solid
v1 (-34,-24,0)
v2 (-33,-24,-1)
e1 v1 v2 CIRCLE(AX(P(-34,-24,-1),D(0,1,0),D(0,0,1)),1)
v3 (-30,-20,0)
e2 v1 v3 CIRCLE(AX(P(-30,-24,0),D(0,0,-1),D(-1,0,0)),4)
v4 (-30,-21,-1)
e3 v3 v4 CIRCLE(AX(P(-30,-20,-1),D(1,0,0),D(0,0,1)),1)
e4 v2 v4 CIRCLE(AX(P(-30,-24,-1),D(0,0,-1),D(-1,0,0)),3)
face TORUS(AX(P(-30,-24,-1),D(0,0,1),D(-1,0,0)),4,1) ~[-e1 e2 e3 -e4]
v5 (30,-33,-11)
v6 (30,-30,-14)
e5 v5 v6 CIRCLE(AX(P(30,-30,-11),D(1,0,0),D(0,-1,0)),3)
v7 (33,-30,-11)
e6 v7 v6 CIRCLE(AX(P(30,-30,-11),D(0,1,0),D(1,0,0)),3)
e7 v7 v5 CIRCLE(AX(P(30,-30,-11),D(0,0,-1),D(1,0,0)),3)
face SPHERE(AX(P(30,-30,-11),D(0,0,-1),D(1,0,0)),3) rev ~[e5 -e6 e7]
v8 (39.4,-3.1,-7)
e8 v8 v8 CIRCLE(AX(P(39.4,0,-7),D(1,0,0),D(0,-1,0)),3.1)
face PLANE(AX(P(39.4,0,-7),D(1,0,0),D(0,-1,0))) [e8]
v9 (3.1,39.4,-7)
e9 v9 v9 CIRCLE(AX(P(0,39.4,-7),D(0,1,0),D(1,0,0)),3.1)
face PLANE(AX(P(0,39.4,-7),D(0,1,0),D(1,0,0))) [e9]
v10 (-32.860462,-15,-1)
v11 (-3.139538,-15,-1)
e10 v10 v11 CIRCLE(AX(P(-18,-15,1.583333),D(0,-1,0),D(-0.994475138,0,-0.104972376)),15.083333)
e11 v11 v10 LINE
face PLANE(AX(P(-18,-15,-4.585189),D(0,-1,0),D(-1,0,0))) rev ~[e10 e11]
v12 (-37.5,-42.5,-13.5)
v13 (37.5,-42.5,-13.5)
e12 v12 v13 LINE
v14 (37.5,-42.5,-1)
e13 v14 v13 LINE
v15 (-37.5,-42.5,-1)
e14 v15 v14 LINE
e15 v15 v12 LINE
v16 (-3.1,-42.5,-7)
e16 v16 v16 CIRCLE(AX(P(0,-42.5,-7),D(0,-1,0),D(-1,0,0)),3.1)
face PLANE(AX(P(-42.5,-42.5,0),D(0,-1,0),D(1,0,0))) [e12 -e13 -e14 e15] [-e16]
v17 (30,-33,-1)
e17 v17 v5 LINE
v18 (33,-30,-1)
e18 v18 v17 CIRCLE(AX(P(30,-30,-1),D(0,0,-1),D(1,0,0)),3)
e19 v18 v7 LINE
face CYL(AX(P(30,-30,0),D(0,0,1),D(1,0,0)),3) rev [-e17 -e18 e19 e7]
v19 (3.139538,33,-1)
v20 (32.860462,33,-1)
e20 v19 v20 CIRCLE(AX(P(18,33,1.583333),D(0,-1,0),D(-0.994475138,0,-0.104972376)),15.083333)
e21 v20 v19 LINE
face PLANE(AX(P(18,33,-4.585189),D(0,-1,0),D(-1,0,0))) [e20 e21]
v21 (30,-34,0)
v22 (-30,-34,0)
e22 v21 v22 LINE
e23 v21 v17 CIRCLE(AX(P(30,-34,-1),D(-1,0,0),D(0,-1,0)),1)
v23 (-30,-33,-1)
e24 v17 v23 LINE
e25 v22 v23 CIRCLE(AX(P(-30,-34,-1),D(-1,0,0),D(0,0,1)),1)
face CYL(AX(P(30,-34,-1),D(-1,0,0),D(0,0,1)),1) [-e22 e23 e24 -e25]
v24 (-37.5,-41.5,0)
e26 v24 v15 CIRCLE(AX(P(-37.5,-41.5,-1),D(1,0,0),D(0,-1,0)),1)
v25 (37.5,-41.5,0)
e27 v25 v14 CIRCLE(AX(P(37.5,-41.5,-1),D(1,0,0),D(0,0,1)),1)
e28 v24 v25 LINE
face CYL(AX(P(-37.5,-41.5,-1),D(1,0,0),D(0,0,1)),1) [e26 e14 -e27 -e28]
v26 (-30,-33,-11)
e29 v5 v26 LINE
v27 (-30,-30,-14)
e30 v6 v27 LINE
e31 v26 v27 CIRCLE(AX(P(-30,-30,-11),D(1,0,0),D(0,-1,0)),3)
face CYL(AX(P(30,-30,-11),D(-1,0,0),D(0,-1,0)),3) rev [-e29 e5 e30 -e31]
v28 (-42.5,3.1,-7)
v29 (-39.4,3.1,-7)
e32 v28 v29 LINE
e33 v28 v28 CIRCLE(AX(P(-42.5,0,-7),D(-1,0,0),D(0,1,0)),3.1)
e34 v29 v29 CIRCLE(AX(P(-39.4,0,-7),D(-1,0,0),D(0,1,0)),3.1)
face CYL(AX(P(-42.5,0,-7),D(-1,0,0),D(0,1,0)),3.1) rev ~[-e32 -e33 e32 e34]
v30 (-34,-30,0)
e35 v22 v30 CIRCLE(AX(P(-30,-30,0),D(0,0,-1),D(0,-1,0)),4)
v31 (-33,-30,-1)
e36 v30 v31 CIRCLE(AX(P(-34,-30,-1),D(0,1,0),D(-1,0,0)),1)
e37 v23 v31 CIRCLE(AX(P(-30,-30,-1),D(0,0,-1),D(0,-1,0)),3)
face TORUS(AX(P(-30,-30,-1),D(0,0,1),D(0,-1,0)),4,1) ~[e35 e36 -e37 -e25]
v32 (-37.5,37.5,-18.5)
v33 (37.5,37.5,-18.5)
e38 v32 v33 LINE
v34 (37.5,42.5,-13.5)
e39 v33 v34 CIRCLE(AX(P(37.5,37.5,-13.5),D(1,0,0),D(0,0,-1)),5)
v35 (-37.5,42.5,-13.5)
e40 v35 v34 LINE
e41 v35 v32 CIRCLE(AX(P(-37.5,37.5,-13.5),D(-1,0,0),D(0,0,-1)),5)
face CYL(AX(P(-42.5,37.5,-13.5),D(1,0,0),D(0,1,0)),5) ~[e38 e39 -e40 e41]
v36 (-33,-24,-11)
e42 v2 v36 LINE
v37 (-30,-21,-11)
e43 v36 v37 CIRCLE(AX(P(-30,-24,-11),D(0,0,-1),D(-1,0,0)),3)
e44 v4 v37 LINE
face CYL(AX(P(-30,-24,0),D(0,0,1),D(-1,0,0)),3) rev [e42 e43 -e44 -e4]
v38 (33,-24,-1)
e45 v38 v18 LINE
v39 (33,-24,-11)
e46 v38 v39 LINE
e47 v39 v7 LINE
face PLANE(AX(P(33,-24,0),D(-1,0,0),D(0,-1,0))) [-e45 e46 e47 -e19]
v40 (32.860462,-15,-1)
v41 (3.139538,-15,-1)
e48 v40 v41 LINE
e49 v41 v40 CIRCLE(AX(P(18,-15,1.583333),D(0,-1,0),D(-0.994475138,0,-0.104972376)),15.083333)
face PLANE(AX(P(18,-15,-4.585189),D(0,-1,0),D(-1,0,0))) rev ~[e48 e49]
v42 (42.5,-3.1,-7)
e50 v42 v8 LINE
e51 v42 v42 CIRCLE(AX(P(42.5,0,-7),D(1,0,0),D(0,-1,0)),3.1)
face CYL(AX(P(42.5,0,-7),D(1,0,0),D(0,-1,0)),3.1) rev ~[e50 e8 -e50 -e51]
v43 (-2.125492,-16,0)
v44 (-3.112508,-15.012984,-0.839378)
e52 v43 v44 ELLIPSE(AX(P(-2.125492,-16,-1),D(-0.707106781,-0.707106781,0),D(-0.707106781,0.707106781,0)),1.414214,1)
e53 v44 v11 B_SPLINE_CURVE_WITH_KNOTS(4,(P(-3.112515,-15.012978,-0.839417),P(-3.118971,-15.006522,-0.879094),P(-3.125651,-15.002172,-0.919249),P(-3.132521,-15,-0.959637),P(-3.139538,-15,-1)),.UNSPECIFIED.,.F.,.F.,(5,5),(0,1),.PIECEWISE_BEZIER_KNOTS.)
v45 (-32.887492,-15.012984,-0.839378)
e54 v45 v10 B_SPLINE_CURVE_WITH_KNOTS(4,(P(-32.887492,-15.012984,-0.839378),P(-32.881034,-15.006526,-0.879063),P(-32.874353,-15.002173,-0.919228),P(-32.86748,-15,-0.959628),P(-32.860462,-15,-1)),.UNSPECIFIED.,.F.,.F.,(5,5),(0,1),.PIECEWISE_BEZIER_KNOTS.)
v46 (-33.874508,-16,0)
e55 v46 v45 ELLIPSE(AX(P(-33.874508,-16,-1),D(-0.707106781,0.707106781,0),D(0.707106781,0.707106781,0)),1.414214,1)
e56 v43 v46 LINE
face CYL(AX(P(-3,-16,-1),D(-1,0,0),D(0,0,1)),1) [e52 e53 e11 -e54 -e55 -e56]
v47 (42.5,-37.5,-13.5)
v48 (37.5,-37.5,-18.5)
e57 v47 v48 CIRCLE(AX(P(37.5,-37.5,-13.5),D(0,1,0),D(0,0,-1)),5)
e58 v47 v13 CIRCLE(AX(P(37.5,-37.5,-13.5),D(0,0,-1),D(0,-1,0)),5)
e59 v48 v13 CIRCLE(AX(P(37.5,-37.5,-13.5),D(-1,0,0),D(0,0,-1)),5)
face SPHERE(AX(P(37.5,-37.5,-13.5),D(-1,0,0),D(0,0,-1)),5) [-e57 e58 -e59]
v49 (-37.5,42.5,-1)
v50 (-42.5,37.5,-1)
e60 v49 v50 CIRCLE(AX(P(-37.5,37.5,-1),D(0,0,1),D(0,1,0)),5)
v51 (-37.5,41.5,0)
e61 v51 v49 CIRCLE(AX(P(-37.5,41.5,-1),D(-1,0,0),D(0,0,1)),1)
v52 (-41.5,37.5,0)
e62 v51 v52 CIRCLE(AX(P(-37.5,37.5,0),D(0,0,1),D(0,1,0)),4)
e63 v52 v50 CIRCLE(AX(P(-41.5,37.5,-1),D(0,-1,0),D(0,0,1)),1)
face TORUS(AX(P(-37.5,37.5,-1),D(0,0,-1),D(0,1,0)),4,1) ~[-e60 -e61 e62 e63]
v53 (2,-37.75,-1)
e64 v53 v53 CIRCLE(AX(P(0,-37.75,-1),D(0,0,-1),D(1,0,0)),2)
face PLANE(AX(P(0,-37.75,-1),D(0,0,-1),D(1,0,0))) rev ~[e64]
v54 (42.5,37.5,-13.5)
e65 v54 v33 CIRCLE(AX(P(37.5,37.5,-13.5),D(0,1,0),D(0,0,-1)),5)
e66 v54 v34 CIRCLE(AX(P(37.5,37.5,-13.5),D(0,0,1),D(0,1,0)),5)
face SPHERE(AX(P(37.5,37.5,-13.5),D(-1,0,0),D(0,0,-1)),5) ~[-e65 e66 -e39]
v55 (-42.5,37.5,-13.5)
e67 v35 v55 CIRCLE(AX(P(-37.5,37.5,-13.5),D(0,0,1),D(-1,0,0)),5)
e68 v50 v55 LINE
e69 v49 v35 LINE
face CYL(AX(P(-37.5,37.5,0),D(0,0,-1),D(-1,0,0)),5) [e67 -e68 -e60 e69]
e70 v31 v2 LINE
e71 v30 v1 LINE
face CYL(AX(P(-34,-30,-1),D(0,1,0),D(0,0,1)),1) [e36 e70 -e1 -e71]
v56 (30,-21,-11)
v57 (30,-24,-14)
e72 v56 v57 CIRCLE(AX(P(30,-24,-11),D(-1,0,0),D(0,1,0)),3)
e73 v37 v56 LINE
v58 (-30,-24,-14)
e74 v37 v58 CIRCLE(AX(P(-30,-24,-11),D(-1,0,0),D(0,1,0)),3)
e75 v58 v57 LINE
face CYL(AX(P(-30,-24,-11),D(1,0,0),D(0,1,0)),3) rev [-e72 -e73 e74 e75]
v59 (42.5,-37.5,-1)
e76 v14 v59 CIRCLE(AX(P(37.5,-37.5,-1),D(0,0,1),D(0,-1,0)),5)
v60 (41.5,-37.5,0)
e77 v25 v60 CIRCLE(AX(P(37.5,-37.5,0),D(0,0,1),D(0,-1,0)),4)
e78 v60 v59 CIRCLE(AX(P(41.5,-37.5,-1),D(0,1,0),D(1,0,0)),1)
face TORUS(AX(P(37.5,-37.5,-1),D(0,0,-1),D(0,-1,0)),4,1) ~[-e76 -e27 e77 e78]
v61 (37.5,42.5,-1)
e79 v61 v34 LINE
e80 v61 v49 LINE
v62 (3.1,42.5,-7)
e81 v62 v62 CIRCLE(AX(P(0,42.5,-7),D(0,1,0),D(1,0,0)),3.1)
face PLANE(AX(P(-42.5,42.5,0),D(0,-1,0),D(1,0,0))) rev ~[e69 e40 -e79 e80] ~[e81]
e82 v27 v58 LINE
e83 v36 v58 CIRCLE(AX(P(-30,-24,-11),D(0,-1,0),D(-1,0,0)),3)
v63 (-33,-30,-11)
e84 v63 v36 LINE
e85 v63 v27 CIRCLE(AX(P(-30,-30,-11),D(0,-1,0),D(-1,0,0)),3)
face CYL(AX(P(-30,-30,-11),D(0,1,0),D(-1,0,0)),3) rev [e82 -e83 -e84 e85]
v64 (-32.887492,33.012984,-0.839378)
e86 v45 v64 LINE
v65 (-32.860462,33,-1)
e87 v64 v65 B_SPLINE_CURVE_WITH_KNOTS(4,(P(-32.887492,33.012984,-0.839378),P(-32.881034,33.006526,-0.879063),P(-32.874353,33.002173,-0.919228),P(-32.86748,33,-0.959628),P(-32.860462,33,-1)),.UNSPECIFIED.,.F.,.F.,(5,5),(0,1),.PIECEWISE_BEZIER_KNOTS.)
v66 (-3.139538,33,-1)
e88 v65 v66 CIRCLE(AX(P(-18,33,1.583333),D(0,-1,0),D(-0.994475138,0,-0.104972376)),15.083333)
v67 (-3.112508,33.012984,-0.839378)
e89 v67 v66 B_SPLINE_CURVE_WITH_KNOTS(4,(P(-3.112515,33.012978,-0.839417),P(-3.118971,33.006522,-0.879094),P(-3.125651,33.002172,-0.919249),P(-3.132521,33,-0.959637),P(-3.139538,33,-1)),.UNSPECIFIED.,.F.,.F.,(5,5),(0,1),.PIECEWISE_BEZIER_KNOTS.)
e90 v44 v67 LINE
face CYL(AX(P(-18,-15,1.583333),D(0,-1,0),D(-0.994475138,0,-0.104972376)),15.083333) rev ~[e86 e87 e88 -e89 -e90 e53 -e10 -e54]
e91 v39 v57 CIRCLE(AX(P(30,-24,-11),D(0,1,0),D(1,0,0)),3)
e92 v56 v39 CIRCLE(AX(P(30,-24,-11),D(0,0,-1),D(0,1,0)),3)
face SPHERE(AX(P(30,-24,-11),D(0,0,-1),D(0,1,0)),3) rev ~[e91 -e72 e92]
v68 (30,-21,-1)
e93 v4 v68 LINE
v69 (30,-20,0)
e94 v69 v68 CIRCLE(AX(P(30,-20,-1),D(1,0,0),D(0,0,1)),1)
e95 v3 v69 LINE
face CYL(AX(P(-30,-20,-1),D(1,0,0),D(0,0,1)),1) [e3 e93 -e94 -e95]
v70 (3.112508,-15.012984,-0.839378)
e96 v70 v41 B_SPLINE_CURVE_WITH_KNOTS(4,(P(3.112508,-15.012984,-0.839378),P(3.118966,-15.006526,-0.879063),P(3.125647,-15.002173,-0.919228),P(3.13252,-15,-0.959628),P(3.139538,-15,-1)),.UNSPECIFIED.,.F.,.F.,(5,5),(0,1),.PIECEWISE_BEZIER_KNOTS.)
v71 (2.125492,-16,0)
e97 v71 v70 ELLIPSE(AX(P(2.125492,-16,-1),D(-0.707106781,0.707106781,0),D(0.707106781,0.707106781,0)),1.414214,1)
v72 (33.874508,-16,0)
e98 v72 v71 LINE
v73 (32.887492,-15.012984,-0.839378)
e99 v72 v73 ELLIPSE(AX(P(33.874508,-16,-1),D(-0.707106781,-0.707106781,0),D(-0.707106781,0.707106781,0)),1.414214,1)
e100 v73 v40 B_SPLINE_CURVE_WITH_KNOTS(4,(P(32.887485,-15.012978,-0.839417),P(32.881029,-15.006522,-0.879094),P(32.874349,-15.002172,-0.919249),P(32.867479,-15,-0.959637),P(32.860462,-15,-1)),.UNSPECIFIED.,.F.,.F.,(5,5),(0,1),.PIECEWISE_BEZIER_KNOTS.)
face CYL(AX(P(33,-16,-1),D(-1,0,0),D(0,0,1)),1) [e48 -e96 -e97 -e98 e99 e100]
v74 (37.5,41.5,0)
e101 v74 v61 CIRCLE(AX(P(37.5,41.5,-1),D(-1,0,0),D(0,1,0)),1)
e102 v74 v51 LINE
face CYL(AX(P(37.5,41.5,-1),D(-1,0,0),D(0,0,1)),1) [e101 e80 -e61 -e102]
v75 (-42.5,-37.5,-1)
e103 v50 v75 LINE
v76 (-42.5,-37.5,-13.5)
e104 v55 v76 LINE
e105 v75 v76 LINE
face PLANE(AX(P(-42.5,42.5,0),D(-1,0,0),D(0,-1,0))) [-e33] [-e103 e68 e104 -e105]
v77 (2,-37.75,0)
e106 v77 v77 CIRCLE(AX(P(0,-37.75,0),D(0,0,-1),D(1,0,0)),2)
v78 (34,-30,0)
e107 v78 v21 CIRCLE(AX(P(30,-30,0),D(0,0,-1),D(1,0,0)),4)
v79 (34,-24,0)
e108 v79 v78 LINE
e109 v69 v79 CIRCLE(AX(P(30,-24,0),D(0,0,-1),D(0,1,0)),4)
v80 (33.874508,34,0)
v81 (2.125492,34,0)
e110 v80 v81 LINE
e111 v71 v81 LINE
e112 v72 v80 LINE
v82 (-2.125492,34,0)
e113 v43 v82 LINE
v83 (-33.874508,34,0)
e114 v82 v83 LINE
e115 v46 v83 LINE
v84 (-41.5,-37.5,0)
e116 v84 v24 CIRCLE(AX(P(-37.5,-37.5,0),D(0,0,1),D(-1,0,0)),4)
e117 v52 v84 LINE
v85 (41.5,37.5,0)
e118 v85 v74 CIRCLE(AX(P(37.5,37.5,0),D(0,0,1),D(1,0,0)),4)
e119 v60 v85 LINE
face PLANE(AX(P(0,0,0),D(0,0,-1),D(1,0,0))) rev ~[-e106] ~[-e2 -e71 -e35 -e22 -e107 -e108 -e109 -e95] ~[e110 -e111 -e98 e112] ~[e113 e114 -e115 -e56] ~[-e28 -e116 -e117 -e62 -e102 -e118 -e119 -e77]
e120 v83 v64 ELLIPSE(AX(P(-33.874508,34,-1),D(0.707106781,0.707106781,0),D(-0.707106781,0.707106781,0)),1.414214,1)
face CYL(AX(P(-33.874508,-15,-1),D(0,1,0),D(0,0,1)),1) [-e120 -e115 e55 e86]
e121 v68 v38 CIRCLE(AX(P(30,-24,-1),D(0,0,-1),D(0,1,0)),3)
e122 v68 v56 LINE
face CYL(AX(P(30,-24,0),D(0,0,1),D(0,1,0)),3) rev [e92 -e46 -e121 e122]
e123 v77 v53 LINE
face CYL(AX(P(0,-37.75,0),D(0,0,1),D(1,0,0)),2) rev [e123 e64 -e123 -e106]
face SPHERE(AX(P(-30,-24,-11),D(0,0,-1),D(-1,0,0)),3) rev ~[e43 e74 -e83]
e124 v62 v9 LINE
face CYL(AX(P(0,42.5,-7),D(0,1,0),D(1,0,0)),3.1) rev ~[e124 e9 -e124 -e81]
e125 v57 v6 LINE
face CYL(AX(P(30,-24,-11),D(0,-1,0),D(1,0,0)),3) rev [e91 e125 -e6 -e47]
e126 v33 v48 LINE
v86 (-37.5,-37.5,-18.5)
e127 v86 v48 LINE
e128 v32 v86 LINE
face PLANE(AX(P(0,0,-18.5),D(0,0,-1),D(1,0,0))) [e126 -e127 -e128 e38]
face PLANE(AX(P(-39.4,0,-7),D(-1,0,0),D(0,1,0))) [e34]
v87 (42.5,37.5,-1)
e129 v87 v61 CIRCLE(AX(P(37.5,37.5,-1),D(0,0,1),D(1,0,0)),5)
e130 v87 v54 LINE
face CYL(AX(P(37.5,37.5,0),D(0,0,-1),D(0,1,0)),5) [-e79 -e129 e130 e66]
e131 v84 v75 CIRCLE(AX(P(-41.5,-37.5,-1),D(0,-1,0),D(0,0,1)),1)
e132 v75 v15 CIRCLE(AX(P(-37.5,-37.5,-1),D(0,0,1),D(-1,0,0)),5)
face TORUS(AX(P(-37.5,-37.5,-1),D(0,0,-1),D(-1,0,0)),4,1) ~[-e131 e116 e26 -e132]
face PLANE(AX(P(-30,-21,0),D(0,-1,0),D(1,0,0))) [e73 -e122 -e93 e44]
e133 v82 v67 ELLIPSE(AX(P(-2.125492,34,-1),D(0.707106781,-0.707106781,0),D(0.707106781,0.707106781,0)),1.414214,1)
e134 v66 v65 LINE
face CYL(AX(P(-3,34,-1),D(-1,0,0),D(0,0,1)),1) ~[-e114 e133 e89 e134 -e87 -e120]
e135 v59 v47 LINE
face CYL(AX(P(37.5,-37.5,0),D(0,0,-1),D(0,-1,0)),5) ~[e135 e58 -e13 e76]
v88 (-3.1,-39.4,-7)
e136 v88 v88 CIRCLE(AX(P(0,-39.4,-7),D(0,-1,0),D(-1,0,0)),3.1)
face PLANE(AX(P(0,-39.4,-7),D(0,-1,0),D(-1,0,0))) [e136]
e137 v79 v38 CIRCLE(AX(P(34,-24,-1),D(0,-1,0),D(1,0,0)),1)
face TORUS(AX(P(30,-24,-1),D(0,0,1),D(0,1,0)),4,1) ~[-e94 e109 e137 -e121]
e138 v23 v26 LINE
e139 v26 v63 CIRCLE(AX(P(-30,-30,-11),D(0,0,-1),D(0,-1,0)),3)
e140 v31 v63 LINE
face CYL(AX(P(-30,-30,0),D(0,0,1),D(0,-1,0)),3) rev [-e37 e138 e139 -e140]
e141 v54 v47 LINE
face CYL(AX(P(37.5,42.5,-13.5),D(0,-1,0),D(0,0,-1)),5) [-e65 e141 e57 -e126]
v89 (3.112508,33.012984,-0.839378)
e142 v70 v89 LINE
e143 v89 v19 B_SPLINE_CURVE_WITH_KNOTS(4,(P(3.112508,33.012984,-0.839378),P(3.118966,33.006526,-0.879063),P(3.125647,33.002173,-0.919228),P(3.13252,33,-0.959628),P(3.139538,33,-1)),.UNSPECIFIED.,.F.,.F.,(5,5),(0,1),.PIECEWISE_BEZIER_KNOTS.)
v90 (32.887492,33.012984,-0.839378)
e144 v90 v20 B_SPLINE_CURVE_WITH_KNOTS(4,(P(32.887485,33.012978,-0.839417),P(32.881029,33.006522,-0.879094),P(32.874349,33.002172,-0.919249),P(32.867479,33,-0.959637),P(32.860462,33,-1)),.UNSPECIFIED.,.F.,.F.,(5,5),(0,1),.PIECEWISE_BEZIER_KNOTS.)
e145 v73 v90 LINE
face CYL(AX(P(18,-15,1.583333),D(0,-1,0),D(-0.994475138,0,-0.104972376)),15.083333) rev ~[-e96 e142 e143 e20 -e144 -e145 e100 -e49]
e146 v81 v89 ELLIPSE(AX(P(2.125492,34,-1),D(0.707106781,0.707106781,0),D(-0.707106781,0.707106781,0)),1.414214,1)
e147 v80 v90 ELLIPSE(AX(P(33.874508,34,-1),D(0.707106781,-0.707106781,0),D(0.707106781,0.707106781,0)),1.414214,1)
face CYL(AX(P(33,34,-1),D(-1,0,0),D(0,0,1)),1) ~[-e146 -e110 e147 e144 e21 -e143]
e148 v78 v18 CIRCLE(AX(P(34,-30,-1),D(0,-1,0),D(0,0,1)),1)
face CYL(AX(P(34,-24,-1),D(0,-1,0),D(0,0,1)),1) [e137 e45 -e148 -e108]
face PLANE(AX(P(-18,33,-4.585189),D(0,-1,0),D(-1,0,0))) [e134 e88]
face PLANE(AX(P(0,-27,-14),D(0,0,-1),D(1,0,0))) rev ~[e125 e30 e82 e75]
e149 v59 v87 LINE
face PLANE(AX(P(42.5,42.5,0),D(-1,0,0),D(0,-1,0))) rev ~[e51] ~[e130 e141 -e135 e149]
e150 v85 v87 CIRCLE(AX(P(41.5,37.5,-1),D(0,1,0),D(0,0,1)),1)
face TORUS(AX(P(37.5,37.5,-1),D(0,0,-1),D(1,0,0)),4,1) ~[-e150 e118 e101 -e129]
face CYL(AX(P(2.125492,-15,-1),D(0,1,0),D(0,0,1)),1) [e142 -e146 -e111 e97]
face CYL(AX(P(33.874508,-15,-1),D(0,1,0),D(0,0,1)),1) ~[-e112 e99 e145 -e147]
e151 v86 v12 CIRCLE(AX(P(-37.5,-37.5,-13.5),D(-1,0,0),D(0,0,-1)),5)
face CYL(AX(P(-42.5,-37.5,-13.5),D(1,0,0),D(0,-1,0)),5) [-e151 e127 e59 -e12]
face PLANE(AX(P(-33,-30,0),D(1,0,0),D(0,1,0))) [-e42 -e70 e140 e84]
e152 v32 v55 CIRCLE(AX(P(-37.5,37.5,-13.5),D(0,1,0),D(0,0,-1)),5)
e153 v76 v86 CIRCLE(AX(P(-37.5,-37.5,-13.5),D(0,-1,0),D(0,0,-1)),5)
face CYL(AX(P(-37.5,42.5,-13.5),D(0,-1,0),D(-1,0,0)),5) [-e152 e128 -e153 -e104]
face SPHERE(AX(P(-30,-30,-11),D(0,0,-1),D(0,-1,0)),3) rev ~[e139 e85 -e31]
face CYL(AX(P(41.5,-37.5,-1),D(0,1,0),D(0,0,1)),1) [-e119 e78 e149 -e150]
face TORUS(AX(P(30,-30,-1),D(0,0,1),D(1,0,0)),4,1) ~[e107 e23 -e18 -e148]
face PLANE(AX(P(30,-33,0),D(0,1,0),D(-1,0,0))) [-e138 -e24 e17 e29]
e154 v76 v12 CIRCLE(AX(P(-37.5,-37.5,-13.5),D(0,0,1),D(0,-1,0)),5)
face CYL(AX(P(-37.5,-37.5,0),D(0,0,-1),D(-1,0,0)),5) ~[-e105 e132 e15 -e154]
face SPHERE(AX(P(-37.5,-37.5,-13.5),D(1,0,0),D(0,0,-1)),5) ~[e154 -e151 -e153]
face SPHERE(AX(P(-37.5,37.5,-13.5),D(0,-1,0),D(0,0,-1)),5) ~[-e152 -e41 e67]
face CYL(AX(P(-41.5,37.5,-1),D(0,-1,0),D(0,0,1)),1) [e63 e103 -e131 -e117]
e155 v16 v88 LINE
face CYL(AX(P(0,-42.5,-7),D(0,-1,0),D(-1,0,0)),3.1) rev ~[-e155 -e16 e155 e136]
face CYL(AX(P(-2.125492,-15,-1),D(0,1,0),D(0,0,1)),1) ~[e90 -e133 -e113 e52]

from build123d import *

# Parameters (mm, degrees)
F0_W      = 85
F0_H      = 85
F0_R      = 2
F3_DEPTH  = 18.5
F4_DEPTH  = 14
F5_R      = 5
F6_R      = 3
F7_R      = 3.1
F8_DEPTH  = 3.1
F9_R      = 3.1
F10_DEPTH = 3.1
F11_R     = 3.1
F12_DEPTH = 3.1
F13_R     = 3.1
F14_DEPTH = 3.1
F15_DEPTH = 1
F18_DEPTH = 48
F19_R     = 1
F20_ANGLE = 180


# Not quite as in the source:
# - a feature names something its author has since deleted; it is built from what else it names


with BuildPart() as f3:
    # F0 (on Top) → F3 (new body)
    with BuildSketch(Plane.XY):
        Rectangle(F0_W, F0_H)
        with BuildLine():
            ThreePointArc((-33, 30), (-32.1213203436, 32.1213203436), (-30, 33))
            Line((-30, 33), (30, 33))
            ThreePointArc((30, 33), (32.1213203436, 32.1213203436), (33, 30))
            Line((33, 30), (33, 24))
            ThreePointArc((33, 24), (32.1213203436, 21.8786796564), (30, 21))
            Line((30, 21), (-30, 21))
            ThreePointArc((-30, 21), (-32.1213203436, 21.8786796564), (-33, 24))
            Line((-33, 24), (-33, 30))
        make_face(mode=Mode.SUBTRACT)
        with Locations((0, 37.75)):
            Circle(F0_R, mode=Mode.SUBTRACT)
        with BuildLine():
            Line((30, 33), (-30, 33))
            ThreePointArc((-30, 33), (-32.1213203436, 32.1213203436), (-33, 30))
            Line((-33, 30), (-33, 24))
            ThreePointArc((-33, 24), (-32.1213203436, 21.8786796564), (-30, 21))
            Line((-30, 21), (30, 21))
            ThreePointArc((30, 21), (32.1213203436, 21.8786796564), (33, 24))
            Line((33, 24), (33, 30))
            ThreePointArc((33, 30), (32.1213203436, 32.1213203436), (30, 33))
        make_face()
        with Locations((0, 37.75)):
            Circle(F0_R)
    extrude(amount=F3_DEPTH)

    # F0 (on Top) → F4 (cut)
    with BuildSketch(Plane.XY):
        with BuildLine():
            Line((30, 33), (-30, 33))
            ThreePointArc((-30, 33), (-32.1213203436, 32.1213203436), (-33, 30))
            Line((-33, 30), (-33, 24))
            ThreePointArc((-33, 24), (-32.1213203436, 21.8786796564), (-30, 21))
            Line((-30, 21), (30, 21))
            ThreePointArc((30, 21), (32.1213203436, 21.8786796564), (33, 24))
            Line((33, 24), (33, 30))
            ThreePointArc((33, 30), (32.1213203436, 32.1213203436), (30, 33))
        make_face()
    extrude(amount=F4_DEPTH, mode=Mode.SUBTRACT)

    # F5
    f5_edges = [f3.edges().sort_by_distance(p)[0] for p in [
        (0, 42.5, 18.5),
        (-42.5, 0, 18.5),
        (0, -42.5, 18.5),
        (42.5, 0, 18.5),
        (42.5, 42.5, 9.25),
        (-42.5, 42.5, 9.25),
        (-42.5, -42.5, 9.25),
        (42.5, -42.5, 9.25),
    ]]
    fillet(f5_edges, radius=F5_R)

    # F6
    f6_edges = [f3.edges().sort_by_distance(p)[0] for p in [
        (0, 33, 14),
        (-32.12132, 32.12132, 14),
        (-33, 27, 14),
        (-32.12132, 21.87868, 14),
        (0, 21, 14),
        (32.12132, 21.87868, 14),
        (33, 27, 14),
        (32.12132, 32.12132, 14),
    ]]
    fillet(f6_edges, radius=F6_R)

    # F7 (on face) → F8 (cut)
    with BuildSketch(Plane.XZ.offset(42.5)):
        with Locations((0, 7)):
            Circle(F7_R)
    extrude(amount=-F8_DEPTH, mode=Mode.SUBTRACT)

    # F9 (on face) → F10 (cut)
    with BuildSketch(Plane(origin=(0, 42.5, 0), x_dir=(-1, 0, 0), z_dir=(0, 1, 0))):
        with Locations((0, 7)):
            Circle(F9_R)
    extrude(amount=-F10_DEPTH, mode=Mode.SUBTRACT)

    # F11 (on face) → F12 (cut)
    with BuildSketch(Plane(origin=(-42.5, 0, 0), x_dir=(0, -1, 0), z_dir=(-1, 0, 0))):
        with Locations((0, 7)):
            Circle(F11_R)
    extrude(amount=-F12_DEPTH, mode=Mode.SUBTRACT)

    # F13 (on face) → F14 (cut)
    with BuildSketch(Plane.YZ.offset(42.5)):
        with Locations((0, 7)):
            Circle(F13_R)
    extrude(amount=-F14_DEPTH, mode=Mode.SUBTRACT)

    # F0 (on Top) → F15 (cut)
    with BuildSketch(Plane.XY):
        with Locations((0, 37.75)):
            Circle(F0_R)
    extrude(amount=F15_DEPTH, mode=Mode.SUBTRACT)

    # F17 (on offset) → F18 (cut)
    with BuildSketch(Plane(origin=(0, 15, 0), x_dir=(-1, 0, 0), z_dir=(0, 1, 0))):
        with BuildLine():
            Line((-33, 0), (-3, 0))
            ThreePointArc((-3, 0), (-18, 13.5), (-33, 0))
        make_face()
        with BuildLine():
            Line((3, 0), (33, 0))
            ThreePointArc((33, 0), (18, 13.5), (3, 0))
        make_face()
    extrude(amount=-F18_DEPTH, mode=Mode.SUBTRACT)

    # F19
    f19_edges = [f3.edges().sort_by_distance(p)[0] for p in [
        (-42.5, 0, 0),
        (-33, -9, 0),
        (-18, 15, 0),
        (-3, -9, 0),
        (-18, -33, 0),
        (3, -9, 0),
        (18, -33, 0),
        (33, -9, 0),
        (18, 15, 0),
        (0, 21, 0),
    ]]
    fillet(f19_edges, radius=F19_R)


with BuildPart() as f3_1:
    # F20: moved
    add(f3.part.rotate(Axis((0, 0, 0), (1, 0, 0)), F20_ANGLE))


solid = f3_1.part
